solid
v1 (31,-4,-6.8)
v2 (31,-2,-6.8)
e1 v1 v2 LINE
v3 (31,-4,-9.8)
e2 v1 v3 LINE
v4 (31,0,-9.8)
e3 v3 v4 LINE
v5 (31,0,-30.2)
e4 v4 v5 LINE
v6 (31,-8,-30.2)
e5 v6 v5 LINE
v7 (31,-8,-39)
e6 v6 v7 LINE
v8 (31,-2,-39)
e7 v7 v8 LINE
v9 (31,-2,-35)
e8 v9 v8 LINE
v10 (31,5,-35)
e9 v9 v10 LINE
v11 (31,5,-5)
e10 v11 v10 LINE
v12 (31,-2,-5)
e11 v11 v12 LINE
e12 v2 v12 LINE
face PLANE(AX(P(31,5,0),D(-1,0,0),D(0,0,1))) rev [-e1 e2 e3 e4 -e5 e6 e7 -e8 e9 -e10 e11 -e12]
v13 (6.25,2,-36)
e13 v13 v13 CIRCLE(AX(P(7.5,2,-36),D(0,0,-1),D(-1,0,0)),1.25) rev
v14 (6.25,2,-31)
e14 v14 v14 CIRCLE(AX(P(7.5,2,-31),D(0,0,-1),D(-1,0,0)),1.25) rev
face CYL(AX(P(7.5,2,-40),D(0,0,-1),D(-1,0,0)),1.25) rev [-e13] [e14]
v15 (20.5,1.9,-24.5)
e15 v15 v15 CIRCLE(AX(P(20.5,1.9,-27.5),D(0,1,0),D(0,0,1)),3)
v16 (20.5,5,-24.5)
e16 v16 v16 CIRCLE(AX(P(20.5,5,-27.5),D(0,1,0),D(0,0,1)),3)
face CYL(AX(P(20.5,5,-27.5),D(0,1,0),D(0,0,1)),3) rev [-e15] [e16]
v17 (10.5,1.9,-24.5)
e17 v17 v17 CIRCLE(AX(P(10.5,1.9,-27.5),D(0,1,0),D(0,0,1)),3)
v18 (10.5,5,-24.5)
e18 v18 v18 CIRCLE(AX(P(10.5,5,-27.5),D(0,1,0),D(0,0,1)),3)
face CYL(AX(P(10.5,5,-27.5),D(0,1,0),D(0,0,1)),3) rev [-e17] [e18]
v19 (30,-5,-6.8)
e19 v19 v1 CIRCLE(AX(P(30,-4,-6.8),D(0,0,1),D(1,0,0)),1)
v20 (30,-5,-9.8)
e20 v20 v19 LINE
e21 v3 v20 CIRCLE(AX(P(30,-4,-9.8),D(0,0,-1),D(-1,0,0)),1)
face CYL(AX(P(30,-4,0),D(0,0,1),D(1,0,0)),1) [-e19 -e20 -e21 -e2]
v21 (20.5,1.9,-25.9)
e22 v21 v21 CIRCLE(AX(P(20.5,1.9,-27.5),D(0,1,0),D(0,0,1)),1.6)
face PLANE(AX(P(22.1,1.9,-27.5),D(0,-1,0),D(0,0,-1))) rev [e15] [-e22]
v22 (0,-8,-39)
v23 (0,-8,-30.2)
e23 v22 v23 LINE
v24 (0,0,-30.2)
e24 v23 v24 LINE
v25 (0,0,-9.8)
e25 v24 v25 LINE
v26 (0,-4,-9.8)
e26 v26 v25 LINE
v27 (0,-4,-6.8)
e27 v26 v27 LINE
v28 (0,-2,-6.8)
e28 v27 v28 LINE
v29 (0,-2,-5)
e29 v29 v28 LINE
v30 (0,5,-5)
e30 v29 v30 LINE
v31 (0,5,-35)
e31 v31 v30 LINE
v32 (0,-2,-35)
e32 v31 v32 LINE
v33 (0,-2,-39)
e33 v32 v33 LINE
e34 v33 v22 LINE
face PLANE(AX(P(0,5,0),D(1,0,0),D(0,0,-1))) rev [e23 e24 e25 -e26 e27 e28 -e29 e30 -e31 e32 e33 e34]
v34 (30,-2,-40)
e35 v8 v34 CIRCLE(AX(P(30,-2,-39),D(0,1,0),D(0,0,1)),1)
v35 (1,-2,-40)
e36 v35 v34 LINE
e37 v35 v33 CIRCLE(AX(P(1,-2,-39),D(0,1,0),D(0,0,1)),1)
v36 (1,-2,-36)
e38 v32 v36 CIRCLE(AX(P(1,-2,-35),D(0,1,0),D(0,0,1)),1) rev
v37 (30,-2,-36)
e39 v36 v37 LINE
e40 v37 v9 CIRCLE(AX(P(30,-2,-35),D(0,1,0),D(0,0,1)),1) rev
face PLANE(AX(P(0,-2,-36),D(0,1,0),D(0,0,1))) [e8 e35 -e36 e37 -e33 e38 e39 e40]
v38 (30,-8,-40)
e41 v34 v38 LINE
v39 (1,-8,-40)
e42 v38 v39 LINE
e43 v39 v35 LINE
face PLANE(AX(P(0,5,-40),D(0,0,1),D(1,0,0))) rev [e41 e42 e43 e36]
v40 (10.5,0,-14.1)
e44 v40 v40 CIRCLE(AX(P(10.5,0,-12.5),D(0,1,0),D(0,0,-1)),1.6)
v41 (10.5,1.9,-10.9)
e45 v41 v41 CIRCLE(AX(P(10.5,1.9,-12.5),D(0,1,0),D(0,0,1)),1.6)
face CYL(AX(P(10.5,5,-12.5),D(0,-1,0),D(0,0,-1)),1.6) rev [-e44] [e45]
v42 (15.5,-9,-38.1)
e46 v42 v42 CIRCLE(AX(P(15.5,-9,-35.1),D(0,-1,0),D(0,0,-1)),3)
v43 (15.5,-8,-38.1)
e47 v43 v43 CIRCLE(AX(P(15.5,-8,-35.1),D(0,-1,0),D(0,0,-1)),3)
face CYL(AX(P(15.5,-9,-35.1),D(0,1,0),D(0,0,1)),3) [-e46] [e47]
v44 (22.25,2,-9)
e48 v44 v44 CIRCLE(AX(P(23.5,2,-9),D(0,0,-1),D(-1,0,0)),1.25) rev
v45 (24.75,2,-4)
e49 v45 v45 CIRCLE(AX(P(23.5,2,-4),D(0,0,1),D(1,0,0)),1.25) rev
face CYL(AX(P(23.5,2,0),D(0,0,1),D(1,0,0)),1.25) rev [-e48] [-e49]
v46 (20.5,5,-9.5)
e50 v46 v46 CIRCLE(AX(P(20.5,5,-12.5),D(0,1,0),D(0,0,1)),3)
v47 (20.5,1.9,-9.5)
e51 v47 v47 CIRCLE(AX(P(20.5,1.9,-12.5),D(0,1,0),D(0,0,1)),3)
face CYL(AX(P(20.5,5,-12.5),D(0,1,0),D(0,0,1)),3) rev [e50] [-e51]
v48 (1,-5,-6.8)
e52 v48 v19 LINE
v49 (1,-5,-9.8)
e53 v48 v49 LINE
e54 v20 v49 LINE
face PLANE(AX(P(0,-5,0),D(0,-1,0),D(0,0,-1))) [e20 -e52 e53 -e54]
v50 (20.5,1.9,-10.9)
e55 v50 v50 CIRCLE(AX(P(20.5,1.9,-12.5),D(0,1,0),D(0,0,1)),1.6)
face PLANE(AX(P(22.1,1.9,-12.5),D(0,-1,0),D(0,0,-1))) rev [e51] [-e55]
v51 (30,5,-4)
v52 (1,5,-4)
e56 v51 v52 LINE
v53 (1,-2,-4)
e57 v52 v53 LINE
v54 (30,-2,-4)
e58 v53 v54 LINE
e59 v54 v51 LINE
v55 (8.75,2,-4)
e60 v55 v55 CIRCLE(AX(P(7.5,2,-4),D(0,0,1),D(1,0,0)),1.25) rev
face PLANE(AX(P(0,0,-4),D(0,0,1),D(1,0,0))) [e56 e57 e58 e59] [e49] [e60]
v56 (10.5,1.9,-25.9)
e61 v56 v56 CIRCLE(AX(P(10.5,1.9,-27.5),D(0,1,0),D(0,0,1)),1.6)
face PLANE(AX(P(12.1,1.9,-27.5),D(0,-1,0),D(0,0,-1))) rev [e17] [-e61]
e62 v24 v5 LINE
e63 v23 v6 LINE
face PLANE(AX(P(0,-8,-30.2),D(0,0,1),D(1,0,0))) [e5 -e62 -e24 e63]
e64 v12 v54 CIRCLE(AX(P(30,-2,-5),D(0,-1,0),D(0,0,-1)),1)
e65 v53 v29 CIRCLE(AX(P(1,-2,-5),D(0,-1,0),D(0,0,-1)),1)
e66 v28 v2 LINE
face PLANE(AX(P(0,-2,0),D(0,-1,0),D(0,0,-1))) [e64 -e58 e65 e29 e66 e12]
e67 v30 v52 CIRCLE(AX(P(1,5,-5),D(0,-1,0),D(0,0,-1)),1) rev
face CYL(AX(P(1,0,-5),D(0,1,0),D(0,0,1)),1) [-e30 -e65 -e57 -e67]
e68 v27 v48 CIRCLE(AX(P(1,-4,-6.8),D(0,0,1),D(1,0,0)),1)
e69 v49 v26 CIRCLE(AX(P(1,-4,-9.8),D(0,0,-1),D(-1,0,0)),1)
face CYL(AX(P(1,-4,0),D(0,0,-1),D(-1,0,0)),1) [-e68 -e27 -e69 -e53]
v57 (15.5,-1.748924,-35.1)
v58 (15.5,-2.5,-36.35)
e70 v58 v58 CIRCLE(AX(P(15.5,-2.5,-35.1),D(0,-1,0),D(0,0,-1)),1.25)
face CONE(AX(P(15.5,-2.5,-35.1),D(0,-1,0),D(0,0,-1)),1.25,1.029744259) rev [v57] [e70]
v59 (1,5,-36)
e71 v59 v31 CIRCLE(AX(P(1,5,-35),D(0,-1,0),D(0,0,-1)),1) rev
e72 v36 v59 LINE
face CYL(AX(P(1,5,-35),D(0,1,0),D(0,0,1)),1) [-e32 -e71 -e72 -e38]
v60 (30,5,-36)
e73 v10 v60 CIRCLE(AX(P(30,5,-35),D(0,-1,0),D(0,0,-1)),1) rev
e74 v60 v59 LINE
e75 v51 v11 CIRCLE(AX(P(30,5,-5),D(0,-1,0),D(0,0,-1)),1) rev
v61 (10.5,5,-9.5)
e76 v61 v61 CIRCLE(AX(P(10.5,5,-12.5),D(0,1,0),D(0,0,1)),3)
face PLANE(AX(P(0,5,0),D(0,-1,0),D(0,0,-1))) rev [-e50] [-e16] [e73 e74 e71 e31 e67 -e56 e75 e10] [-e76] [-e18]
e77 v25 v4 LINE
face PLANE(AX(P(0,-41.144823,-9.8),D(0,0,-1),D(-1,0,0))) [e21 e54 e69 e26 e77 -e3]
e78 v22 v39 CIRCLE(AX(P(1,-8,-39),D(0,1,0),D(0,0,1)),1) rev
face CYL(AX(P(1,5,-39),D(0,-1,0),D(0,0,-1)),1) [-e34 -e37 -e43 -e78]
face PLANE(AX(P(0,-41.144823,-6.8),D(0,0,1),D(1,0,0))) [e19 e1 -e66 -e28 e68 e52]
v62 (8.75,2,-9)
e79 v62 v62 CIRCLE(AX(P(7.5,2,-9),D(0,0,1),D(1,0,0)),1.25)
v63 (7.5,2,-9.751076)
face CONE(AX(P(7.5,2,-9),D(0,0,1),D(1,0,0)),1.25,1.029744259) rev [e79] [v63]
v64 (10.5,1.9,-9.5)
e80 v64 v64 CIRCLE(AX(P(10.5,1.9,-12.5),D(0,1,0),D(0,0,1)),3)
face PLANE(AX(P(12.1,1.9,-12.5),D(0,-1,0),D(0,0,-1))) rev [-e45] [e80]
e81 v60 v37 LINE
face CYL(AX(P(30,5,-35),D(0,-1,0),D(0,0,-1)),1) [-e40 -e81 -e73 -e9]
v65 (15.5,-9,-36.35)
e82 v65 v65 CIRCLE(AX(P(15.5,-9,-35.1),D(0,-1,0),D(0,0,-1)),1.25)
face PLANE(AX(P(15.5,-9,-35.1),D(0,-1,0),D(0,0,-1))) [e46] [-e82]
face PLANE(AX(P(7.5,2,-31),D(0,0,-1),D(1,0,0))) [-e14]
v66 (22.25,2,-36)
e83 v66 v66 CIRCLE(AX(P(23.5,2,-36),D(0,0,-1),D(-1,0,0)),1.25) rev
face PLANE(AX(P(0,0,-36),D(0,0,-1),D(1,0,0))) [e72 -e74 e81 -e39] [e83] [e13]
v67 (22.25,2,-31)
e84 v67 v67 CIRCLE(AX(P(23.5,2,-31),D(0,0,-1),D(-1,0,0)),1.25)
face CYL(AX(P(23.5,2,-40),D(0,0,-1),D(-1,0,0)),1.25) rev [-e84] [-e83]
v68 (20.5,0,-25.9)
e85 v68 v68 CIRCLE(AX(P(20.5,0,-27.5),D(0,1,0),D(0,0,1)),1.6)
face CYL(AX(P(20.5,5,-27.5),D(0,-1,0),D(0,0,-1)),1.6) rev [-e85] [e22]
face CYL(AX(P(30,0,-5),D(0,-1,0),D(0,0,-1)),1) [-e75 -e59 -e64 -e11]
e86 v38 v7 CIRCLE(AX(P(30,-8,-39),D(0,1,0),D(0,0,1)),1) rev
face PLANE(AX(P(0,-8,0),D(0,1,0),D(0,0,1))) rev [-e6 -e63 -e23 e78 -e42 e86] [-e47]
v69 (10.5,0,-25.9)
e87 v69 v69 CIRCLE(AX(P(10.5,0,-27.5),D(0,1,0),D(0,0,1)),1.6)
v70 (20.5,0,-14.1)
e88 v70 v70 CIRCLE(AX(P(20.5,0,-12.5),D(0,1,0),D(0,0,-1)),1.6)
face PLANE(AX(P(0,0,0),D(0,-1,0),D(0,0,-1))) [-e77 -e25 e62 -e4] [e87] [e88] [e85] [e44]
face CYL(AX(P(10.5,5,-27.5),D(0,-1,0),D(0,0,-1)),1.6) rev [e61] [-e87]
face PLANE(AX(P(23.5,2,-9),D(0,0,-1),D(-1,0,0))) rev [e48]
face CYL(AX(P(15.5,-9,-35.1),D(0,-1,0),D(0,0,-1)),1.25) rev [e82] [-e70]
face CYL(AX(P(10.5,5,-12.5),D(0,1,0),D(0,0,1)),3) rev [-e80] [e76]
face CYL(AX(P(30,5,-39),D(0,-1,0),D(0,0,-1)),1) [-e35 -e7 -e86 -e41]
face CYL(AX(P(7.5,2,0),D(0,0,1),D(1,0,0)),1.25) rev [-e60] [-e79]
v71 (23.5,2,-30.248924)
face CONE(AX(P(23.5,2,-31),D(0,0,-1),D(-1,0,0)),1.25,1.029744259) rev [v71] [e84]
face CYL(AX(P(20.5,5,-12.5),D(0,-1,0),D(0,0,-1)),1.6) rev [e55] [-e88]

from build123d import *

# Parameters (mm, degrees)
SKETCH_1_W                     = 31
SKETCH_1_H                     = 40
SKETCH_1_R                     = 1.6
EXTRUDE_1_DEPTH                = 5
SKETCH_2_W                     = 31
SKETCH_2_H                     = 9.8
EXTRUDE_3_DEPTH                = 8
SKETCH_13_R                    = 1
CUT_EXTRUDE_7_DEPTH            = 5
EXTRUDE_START                  = 1
SKETCH_14_R                    = 3
SKETCH_14_R_2                  = 1
EXTRUDE_8_DEPTH                = 1
HOLE_WIZARD_M3_3_D             = 2.5
HOLE_WIZARD_M3_3_DEPTH         = 6.5
HOLE_WIZARD_M3_3_TIP           = 0.751075774
SKETCH_18_W                    = 31
SKETCH_18_H                    = 3
EXTRUDE_9_DEPTH                = 10
SKETCH_29_W                    = 31
SKETCH_29_H                    = 6.8
EXTRUDE_11_DEPTH               = 2
SKETCH_20_R                    = 1
CUT_EXTRUDE_9_DEPTH            = 9
HOLE_START                     = -9
HOLE_WIZARD_M3_1_OUTLINE_R     = 1.25
HOLE_WIZARD_M3_1_OUTLINE_R_2   = 1
HOLE_WIZARD_M3_1_DEPTH         = 9
HOLE_WIZARD_M3_1_3_D           = 3.2
HOLE_WIZARD_M3_1_3_CBORE_D     = 6
HOLE_WIZARD_M3_1_3_CBORE_DEPTH = 3.1
HOLE_START_2                   = -40
HOLE_WIZARD_M3_2_OUTLINE_R     = 1.25
HOLE_WIZARD_M3_2_OUTLINE_R_2   = 1
HOLE_WIZARD_M3_2_DEPTH         = 9
SKETCH_30_W                    = 31
SKETCH_30_H                    = 7
CUT_EXTRUDE_10_DEPTH           = 4
FILLET_3_R                     = 1


# Read off the part's stored shape, not the designer's step: M3 螺纹孔1, M3 螺纹孔2
with BuildPart() as part:
    # 草图1 → 凸台-拉伸1 (new body)
    with BuildSketch(Plane(origin=(0, 0, 0), x_dir=(1, 0, 0), z_dir=(0, 1, 0))):
        with Locations((15.5, 20)):
            Rectangle(SKETCH_1_W, SKETCH_1_H)
        with Locations(Location((20.5, 27.5, 0), (0, 0, 270))):
            Circle(SKETCH_1_R, mode=Mode.SUBTRACT)
        with Locations(Location((10.5, 27.5, 0), (0, 0, 270))):
            Circle(SKETCH_1_R, mode=Mode.SUBTRACT)
        with Locations(Location((10.5, 12.5, 0), (0, 0, 90))):
            Circle(SKETCH_1_R, mode=Mode.SUBTRACT)
        with Locations(Location((20.5, 12.5, 0), (0, 0, 90))):
            Circle(SKETCH_1_R, mode=Mode.SUBTRACT)
    extrude(amount=EXTRUDE_1_DEPTH)

    # 草图2 → 凸台-拉伸3 (add)
    with BuildSketch(Plane(origin=(0, 0, 0), x_dir=(1, 0, 0), z_dir=(0, 1, 0))):
        with Locations((15.5, 35.1)):
            Rectangle(SKETCH_2_W, SKETCH_2_H)
    extrude(amount=-EXTRUDE_3_DEPTH)

    # 草图13 → 切除-拉伸7 (cut)
    with BuildSketch(Plane.XZ.offset(8)):
        with Locations(Location((15.5, -35.1, 0), (0, 0, 270))):
            Circle(SKETCH_13_R)
    extrude(amount=-CUT_EXTRUDE_7_DEPTH, mode=Mode.SUBTRACT)

    # 草图14 → 凸台-拉伸8 (add)
    with BuildSketch(Plane.XZ.offset(8).offset(EXTRUDE_START)):
        with Locations(Location((15.5, -35.1, 0), (0, 0, 270))):
            Circle(SKETCH_14_R)
        with Locations(Location((15.5, -35.1, 0), (0, 0, 270))):
            Circle(SKETCH_14_R_2, mode=Mode.SUBTRACT)
    extrude(amount=-EXTRUDE_8_DEPTH)

    # M3 螺纹孔3
    with Locations(Plane(origin=(0, -9, 0), x_dir=(-1, 0, 0), z_dir=(0, -1, 0))):
        with Locations((-15.5, 35.1)):
            Hole(HOLE_WIZARD_M3_3_D / 2, depth=HOLE_WIZARD_M3_3_DEPTH)
            with Locations((0, 0, -(HOLE_WIZARD_M3_3_DEPTH + HOLE_WIZARD_M3_3_TIP / 2))):  # 118° drill point
                Cone(0, HOLE_WIZARD_M3_3_D / 2, HOLE_WIZARD_M3_3_TIP, mode=Mode.SUBTRACT)

    # 草图18 → 凸台-拉伸9 (add)
    with BuildSketch(Plane(origin=(0, 5, 0), x_dir=(1, 0, 0), z_dir=(0, 1, 0))):
        with Locations((15.5, 8.3)):
            Rectangle(SKETCH_18_W, SKETCH_18_H)
    extrude(amount=-EXTRUDE_9_DEPTH)

    # 草图29 → 凸台-拉伸11 (add)
    with BuildSketch(Plane.XZ):
        with Locations((15.5, -3.4)):
            Rectangle(SKETCH_29_W, SKETCH_29_H)
    extrude(amount=EXTRUDE_11_DEPTH)

    # 草图20 → 切除-拉伸9 (cut)
    with BuildSketch(Plane.XY):
        with Locations((7.5, 2)):
            Circle(SKETCH_20_R)
        with Locations(Location((23.5, 2, 0), (0, 0, 180))):
            Circle(SKETCH_20_R)
    cut_extrude_9 = extrude(amount=-CUT_EXTRUDE_9_DEPTH, mode=Mode.SUBTRACT)

    # Hole Wizard M3 _1 outline → Hole Wizard M3 _1 (cut)
    with BuildSketch(Plane.XY.offset(HOLE_START)):
        with Locations((23.5, 2)):
            Circle(HOLE_WIZARD_M3_1_OUTLINE_R)
        with Locations((23.5, 2)):
            Circle(HOLE_WIZARD_M3_1_OUTLINE_R_2, mode=Mode.SUBTRACT)
    extrude(amount=HOLE_WIZARD_M3_1_DEPTH, mode=Mode.SUBTRACT)

    # Hole Wizard M3 _1 2 outline → Hole Wizard M3 _1 2 (revolve, cut)
    with BuildSketch(Plane(origin=(7.5, 2, 0), x_dir=(1, 0, 0), z_dir=(0, -1, 0))):
        Polygon((0, -9), (0, -9.751075774), (1.25, -9), (1.25, 0), (1, 0), (1, -9), align=None)
    revolve(axis=Axis((7.5, 2, 0), (0, 0, 1)), mode=Mode.SUBTRACT)

    # 镜向1: 切除-拉伸9 across plane
    add(cut_extrude_9.mirror(Plane.XY.offset(-20)), mode=Mode.SUBTRACT)

    # Hole Wizard M3 _1 3 (through all)
    with Locations(Plane(origin=(0, 5, 0), x_dir=(1, 0, 0), z_dir=(0, 1, 0))):
        with Locations((10.5, 27.5), (10.5, 12.5), (20.5, 12.5), (20.5, 27.5)):
            CounterBoreHole(HOLE_WIZARD_M3_1_3_D / 2, HOLE_WIZARD_M3_1_3_CBORE_D / 2, HOLE_WIZARD_M3_1_3_CBORE_DEPTH)

    # M3 螺纹孔2 outline → M3 螺纹孔2 (cut)
    with BuildSketch(Plane.XY.offset(HOLE_START_2)):
        with Locations((7.5, 2)):
            Circle(HOLE_WIZARD_M3_2_OUTLINE_R)
        with Locations((7.5, 2)):
            Circle(HOLE_WIZARD_M3_2_OUTLINE_R_2, mode=Mode.SUBTRACT)
    extrude(amount=HOLE_WIZARD_M3_2_DEPTH, mode=Mode.SUBTRACT)

    # Hole Wizard M3 _2 2 outline → Hole Wizard M3 _2 2 (revolve, cut)
    with BuildSketch(Plane(origin=(23.5, 2, 0), x_dir=(1, 0, 0), z_dir=(0, -1, 0))):
        Polygon((1.25, -31), (0, -30.248924226), (0, -31), (1, -31), (1, -40), (1.25, -40), align=None)
    revolve(axis=Axis((23.5, 2, 0), (0, 0, 1)), mode=Mode.SUBTRACT)

    # 草图30 → 切除-拉伸10 (cut)
    with BuildSketch(Plane.XY):
        with Locations((15.5, 1.5)):
            Rectangle(SKETCH_30_W, SKETCH_30_H)
    cut_extrude_10 = extrude(amount=-CUT_EXTRUDE_10_DEPTH, mode=Mode.SUBTRACT)

    # 镜向3: 切除-拉伸10 across plane
    add(cut_extrude_10.mirror(Plane.XY.offset(-20)), mode=Mode.SUBTRACT)

    # 圆角3
    fillet_3_edges = [part.edges().sort_by_distance(p)[0] for p in [
        (31, 1.5, -4),
        (0, 1.5, -4),
        (31, -5, -40),
        (0, -5, -40),
        (0, 1.5, -36),
        (31, 1.5, -36),
        (31, -5, -8.3),
        (0, -5, -8.3),
    ]]
    fillet(fillet_3_edges, radius=FILLET_3_R)


solid = part.part
